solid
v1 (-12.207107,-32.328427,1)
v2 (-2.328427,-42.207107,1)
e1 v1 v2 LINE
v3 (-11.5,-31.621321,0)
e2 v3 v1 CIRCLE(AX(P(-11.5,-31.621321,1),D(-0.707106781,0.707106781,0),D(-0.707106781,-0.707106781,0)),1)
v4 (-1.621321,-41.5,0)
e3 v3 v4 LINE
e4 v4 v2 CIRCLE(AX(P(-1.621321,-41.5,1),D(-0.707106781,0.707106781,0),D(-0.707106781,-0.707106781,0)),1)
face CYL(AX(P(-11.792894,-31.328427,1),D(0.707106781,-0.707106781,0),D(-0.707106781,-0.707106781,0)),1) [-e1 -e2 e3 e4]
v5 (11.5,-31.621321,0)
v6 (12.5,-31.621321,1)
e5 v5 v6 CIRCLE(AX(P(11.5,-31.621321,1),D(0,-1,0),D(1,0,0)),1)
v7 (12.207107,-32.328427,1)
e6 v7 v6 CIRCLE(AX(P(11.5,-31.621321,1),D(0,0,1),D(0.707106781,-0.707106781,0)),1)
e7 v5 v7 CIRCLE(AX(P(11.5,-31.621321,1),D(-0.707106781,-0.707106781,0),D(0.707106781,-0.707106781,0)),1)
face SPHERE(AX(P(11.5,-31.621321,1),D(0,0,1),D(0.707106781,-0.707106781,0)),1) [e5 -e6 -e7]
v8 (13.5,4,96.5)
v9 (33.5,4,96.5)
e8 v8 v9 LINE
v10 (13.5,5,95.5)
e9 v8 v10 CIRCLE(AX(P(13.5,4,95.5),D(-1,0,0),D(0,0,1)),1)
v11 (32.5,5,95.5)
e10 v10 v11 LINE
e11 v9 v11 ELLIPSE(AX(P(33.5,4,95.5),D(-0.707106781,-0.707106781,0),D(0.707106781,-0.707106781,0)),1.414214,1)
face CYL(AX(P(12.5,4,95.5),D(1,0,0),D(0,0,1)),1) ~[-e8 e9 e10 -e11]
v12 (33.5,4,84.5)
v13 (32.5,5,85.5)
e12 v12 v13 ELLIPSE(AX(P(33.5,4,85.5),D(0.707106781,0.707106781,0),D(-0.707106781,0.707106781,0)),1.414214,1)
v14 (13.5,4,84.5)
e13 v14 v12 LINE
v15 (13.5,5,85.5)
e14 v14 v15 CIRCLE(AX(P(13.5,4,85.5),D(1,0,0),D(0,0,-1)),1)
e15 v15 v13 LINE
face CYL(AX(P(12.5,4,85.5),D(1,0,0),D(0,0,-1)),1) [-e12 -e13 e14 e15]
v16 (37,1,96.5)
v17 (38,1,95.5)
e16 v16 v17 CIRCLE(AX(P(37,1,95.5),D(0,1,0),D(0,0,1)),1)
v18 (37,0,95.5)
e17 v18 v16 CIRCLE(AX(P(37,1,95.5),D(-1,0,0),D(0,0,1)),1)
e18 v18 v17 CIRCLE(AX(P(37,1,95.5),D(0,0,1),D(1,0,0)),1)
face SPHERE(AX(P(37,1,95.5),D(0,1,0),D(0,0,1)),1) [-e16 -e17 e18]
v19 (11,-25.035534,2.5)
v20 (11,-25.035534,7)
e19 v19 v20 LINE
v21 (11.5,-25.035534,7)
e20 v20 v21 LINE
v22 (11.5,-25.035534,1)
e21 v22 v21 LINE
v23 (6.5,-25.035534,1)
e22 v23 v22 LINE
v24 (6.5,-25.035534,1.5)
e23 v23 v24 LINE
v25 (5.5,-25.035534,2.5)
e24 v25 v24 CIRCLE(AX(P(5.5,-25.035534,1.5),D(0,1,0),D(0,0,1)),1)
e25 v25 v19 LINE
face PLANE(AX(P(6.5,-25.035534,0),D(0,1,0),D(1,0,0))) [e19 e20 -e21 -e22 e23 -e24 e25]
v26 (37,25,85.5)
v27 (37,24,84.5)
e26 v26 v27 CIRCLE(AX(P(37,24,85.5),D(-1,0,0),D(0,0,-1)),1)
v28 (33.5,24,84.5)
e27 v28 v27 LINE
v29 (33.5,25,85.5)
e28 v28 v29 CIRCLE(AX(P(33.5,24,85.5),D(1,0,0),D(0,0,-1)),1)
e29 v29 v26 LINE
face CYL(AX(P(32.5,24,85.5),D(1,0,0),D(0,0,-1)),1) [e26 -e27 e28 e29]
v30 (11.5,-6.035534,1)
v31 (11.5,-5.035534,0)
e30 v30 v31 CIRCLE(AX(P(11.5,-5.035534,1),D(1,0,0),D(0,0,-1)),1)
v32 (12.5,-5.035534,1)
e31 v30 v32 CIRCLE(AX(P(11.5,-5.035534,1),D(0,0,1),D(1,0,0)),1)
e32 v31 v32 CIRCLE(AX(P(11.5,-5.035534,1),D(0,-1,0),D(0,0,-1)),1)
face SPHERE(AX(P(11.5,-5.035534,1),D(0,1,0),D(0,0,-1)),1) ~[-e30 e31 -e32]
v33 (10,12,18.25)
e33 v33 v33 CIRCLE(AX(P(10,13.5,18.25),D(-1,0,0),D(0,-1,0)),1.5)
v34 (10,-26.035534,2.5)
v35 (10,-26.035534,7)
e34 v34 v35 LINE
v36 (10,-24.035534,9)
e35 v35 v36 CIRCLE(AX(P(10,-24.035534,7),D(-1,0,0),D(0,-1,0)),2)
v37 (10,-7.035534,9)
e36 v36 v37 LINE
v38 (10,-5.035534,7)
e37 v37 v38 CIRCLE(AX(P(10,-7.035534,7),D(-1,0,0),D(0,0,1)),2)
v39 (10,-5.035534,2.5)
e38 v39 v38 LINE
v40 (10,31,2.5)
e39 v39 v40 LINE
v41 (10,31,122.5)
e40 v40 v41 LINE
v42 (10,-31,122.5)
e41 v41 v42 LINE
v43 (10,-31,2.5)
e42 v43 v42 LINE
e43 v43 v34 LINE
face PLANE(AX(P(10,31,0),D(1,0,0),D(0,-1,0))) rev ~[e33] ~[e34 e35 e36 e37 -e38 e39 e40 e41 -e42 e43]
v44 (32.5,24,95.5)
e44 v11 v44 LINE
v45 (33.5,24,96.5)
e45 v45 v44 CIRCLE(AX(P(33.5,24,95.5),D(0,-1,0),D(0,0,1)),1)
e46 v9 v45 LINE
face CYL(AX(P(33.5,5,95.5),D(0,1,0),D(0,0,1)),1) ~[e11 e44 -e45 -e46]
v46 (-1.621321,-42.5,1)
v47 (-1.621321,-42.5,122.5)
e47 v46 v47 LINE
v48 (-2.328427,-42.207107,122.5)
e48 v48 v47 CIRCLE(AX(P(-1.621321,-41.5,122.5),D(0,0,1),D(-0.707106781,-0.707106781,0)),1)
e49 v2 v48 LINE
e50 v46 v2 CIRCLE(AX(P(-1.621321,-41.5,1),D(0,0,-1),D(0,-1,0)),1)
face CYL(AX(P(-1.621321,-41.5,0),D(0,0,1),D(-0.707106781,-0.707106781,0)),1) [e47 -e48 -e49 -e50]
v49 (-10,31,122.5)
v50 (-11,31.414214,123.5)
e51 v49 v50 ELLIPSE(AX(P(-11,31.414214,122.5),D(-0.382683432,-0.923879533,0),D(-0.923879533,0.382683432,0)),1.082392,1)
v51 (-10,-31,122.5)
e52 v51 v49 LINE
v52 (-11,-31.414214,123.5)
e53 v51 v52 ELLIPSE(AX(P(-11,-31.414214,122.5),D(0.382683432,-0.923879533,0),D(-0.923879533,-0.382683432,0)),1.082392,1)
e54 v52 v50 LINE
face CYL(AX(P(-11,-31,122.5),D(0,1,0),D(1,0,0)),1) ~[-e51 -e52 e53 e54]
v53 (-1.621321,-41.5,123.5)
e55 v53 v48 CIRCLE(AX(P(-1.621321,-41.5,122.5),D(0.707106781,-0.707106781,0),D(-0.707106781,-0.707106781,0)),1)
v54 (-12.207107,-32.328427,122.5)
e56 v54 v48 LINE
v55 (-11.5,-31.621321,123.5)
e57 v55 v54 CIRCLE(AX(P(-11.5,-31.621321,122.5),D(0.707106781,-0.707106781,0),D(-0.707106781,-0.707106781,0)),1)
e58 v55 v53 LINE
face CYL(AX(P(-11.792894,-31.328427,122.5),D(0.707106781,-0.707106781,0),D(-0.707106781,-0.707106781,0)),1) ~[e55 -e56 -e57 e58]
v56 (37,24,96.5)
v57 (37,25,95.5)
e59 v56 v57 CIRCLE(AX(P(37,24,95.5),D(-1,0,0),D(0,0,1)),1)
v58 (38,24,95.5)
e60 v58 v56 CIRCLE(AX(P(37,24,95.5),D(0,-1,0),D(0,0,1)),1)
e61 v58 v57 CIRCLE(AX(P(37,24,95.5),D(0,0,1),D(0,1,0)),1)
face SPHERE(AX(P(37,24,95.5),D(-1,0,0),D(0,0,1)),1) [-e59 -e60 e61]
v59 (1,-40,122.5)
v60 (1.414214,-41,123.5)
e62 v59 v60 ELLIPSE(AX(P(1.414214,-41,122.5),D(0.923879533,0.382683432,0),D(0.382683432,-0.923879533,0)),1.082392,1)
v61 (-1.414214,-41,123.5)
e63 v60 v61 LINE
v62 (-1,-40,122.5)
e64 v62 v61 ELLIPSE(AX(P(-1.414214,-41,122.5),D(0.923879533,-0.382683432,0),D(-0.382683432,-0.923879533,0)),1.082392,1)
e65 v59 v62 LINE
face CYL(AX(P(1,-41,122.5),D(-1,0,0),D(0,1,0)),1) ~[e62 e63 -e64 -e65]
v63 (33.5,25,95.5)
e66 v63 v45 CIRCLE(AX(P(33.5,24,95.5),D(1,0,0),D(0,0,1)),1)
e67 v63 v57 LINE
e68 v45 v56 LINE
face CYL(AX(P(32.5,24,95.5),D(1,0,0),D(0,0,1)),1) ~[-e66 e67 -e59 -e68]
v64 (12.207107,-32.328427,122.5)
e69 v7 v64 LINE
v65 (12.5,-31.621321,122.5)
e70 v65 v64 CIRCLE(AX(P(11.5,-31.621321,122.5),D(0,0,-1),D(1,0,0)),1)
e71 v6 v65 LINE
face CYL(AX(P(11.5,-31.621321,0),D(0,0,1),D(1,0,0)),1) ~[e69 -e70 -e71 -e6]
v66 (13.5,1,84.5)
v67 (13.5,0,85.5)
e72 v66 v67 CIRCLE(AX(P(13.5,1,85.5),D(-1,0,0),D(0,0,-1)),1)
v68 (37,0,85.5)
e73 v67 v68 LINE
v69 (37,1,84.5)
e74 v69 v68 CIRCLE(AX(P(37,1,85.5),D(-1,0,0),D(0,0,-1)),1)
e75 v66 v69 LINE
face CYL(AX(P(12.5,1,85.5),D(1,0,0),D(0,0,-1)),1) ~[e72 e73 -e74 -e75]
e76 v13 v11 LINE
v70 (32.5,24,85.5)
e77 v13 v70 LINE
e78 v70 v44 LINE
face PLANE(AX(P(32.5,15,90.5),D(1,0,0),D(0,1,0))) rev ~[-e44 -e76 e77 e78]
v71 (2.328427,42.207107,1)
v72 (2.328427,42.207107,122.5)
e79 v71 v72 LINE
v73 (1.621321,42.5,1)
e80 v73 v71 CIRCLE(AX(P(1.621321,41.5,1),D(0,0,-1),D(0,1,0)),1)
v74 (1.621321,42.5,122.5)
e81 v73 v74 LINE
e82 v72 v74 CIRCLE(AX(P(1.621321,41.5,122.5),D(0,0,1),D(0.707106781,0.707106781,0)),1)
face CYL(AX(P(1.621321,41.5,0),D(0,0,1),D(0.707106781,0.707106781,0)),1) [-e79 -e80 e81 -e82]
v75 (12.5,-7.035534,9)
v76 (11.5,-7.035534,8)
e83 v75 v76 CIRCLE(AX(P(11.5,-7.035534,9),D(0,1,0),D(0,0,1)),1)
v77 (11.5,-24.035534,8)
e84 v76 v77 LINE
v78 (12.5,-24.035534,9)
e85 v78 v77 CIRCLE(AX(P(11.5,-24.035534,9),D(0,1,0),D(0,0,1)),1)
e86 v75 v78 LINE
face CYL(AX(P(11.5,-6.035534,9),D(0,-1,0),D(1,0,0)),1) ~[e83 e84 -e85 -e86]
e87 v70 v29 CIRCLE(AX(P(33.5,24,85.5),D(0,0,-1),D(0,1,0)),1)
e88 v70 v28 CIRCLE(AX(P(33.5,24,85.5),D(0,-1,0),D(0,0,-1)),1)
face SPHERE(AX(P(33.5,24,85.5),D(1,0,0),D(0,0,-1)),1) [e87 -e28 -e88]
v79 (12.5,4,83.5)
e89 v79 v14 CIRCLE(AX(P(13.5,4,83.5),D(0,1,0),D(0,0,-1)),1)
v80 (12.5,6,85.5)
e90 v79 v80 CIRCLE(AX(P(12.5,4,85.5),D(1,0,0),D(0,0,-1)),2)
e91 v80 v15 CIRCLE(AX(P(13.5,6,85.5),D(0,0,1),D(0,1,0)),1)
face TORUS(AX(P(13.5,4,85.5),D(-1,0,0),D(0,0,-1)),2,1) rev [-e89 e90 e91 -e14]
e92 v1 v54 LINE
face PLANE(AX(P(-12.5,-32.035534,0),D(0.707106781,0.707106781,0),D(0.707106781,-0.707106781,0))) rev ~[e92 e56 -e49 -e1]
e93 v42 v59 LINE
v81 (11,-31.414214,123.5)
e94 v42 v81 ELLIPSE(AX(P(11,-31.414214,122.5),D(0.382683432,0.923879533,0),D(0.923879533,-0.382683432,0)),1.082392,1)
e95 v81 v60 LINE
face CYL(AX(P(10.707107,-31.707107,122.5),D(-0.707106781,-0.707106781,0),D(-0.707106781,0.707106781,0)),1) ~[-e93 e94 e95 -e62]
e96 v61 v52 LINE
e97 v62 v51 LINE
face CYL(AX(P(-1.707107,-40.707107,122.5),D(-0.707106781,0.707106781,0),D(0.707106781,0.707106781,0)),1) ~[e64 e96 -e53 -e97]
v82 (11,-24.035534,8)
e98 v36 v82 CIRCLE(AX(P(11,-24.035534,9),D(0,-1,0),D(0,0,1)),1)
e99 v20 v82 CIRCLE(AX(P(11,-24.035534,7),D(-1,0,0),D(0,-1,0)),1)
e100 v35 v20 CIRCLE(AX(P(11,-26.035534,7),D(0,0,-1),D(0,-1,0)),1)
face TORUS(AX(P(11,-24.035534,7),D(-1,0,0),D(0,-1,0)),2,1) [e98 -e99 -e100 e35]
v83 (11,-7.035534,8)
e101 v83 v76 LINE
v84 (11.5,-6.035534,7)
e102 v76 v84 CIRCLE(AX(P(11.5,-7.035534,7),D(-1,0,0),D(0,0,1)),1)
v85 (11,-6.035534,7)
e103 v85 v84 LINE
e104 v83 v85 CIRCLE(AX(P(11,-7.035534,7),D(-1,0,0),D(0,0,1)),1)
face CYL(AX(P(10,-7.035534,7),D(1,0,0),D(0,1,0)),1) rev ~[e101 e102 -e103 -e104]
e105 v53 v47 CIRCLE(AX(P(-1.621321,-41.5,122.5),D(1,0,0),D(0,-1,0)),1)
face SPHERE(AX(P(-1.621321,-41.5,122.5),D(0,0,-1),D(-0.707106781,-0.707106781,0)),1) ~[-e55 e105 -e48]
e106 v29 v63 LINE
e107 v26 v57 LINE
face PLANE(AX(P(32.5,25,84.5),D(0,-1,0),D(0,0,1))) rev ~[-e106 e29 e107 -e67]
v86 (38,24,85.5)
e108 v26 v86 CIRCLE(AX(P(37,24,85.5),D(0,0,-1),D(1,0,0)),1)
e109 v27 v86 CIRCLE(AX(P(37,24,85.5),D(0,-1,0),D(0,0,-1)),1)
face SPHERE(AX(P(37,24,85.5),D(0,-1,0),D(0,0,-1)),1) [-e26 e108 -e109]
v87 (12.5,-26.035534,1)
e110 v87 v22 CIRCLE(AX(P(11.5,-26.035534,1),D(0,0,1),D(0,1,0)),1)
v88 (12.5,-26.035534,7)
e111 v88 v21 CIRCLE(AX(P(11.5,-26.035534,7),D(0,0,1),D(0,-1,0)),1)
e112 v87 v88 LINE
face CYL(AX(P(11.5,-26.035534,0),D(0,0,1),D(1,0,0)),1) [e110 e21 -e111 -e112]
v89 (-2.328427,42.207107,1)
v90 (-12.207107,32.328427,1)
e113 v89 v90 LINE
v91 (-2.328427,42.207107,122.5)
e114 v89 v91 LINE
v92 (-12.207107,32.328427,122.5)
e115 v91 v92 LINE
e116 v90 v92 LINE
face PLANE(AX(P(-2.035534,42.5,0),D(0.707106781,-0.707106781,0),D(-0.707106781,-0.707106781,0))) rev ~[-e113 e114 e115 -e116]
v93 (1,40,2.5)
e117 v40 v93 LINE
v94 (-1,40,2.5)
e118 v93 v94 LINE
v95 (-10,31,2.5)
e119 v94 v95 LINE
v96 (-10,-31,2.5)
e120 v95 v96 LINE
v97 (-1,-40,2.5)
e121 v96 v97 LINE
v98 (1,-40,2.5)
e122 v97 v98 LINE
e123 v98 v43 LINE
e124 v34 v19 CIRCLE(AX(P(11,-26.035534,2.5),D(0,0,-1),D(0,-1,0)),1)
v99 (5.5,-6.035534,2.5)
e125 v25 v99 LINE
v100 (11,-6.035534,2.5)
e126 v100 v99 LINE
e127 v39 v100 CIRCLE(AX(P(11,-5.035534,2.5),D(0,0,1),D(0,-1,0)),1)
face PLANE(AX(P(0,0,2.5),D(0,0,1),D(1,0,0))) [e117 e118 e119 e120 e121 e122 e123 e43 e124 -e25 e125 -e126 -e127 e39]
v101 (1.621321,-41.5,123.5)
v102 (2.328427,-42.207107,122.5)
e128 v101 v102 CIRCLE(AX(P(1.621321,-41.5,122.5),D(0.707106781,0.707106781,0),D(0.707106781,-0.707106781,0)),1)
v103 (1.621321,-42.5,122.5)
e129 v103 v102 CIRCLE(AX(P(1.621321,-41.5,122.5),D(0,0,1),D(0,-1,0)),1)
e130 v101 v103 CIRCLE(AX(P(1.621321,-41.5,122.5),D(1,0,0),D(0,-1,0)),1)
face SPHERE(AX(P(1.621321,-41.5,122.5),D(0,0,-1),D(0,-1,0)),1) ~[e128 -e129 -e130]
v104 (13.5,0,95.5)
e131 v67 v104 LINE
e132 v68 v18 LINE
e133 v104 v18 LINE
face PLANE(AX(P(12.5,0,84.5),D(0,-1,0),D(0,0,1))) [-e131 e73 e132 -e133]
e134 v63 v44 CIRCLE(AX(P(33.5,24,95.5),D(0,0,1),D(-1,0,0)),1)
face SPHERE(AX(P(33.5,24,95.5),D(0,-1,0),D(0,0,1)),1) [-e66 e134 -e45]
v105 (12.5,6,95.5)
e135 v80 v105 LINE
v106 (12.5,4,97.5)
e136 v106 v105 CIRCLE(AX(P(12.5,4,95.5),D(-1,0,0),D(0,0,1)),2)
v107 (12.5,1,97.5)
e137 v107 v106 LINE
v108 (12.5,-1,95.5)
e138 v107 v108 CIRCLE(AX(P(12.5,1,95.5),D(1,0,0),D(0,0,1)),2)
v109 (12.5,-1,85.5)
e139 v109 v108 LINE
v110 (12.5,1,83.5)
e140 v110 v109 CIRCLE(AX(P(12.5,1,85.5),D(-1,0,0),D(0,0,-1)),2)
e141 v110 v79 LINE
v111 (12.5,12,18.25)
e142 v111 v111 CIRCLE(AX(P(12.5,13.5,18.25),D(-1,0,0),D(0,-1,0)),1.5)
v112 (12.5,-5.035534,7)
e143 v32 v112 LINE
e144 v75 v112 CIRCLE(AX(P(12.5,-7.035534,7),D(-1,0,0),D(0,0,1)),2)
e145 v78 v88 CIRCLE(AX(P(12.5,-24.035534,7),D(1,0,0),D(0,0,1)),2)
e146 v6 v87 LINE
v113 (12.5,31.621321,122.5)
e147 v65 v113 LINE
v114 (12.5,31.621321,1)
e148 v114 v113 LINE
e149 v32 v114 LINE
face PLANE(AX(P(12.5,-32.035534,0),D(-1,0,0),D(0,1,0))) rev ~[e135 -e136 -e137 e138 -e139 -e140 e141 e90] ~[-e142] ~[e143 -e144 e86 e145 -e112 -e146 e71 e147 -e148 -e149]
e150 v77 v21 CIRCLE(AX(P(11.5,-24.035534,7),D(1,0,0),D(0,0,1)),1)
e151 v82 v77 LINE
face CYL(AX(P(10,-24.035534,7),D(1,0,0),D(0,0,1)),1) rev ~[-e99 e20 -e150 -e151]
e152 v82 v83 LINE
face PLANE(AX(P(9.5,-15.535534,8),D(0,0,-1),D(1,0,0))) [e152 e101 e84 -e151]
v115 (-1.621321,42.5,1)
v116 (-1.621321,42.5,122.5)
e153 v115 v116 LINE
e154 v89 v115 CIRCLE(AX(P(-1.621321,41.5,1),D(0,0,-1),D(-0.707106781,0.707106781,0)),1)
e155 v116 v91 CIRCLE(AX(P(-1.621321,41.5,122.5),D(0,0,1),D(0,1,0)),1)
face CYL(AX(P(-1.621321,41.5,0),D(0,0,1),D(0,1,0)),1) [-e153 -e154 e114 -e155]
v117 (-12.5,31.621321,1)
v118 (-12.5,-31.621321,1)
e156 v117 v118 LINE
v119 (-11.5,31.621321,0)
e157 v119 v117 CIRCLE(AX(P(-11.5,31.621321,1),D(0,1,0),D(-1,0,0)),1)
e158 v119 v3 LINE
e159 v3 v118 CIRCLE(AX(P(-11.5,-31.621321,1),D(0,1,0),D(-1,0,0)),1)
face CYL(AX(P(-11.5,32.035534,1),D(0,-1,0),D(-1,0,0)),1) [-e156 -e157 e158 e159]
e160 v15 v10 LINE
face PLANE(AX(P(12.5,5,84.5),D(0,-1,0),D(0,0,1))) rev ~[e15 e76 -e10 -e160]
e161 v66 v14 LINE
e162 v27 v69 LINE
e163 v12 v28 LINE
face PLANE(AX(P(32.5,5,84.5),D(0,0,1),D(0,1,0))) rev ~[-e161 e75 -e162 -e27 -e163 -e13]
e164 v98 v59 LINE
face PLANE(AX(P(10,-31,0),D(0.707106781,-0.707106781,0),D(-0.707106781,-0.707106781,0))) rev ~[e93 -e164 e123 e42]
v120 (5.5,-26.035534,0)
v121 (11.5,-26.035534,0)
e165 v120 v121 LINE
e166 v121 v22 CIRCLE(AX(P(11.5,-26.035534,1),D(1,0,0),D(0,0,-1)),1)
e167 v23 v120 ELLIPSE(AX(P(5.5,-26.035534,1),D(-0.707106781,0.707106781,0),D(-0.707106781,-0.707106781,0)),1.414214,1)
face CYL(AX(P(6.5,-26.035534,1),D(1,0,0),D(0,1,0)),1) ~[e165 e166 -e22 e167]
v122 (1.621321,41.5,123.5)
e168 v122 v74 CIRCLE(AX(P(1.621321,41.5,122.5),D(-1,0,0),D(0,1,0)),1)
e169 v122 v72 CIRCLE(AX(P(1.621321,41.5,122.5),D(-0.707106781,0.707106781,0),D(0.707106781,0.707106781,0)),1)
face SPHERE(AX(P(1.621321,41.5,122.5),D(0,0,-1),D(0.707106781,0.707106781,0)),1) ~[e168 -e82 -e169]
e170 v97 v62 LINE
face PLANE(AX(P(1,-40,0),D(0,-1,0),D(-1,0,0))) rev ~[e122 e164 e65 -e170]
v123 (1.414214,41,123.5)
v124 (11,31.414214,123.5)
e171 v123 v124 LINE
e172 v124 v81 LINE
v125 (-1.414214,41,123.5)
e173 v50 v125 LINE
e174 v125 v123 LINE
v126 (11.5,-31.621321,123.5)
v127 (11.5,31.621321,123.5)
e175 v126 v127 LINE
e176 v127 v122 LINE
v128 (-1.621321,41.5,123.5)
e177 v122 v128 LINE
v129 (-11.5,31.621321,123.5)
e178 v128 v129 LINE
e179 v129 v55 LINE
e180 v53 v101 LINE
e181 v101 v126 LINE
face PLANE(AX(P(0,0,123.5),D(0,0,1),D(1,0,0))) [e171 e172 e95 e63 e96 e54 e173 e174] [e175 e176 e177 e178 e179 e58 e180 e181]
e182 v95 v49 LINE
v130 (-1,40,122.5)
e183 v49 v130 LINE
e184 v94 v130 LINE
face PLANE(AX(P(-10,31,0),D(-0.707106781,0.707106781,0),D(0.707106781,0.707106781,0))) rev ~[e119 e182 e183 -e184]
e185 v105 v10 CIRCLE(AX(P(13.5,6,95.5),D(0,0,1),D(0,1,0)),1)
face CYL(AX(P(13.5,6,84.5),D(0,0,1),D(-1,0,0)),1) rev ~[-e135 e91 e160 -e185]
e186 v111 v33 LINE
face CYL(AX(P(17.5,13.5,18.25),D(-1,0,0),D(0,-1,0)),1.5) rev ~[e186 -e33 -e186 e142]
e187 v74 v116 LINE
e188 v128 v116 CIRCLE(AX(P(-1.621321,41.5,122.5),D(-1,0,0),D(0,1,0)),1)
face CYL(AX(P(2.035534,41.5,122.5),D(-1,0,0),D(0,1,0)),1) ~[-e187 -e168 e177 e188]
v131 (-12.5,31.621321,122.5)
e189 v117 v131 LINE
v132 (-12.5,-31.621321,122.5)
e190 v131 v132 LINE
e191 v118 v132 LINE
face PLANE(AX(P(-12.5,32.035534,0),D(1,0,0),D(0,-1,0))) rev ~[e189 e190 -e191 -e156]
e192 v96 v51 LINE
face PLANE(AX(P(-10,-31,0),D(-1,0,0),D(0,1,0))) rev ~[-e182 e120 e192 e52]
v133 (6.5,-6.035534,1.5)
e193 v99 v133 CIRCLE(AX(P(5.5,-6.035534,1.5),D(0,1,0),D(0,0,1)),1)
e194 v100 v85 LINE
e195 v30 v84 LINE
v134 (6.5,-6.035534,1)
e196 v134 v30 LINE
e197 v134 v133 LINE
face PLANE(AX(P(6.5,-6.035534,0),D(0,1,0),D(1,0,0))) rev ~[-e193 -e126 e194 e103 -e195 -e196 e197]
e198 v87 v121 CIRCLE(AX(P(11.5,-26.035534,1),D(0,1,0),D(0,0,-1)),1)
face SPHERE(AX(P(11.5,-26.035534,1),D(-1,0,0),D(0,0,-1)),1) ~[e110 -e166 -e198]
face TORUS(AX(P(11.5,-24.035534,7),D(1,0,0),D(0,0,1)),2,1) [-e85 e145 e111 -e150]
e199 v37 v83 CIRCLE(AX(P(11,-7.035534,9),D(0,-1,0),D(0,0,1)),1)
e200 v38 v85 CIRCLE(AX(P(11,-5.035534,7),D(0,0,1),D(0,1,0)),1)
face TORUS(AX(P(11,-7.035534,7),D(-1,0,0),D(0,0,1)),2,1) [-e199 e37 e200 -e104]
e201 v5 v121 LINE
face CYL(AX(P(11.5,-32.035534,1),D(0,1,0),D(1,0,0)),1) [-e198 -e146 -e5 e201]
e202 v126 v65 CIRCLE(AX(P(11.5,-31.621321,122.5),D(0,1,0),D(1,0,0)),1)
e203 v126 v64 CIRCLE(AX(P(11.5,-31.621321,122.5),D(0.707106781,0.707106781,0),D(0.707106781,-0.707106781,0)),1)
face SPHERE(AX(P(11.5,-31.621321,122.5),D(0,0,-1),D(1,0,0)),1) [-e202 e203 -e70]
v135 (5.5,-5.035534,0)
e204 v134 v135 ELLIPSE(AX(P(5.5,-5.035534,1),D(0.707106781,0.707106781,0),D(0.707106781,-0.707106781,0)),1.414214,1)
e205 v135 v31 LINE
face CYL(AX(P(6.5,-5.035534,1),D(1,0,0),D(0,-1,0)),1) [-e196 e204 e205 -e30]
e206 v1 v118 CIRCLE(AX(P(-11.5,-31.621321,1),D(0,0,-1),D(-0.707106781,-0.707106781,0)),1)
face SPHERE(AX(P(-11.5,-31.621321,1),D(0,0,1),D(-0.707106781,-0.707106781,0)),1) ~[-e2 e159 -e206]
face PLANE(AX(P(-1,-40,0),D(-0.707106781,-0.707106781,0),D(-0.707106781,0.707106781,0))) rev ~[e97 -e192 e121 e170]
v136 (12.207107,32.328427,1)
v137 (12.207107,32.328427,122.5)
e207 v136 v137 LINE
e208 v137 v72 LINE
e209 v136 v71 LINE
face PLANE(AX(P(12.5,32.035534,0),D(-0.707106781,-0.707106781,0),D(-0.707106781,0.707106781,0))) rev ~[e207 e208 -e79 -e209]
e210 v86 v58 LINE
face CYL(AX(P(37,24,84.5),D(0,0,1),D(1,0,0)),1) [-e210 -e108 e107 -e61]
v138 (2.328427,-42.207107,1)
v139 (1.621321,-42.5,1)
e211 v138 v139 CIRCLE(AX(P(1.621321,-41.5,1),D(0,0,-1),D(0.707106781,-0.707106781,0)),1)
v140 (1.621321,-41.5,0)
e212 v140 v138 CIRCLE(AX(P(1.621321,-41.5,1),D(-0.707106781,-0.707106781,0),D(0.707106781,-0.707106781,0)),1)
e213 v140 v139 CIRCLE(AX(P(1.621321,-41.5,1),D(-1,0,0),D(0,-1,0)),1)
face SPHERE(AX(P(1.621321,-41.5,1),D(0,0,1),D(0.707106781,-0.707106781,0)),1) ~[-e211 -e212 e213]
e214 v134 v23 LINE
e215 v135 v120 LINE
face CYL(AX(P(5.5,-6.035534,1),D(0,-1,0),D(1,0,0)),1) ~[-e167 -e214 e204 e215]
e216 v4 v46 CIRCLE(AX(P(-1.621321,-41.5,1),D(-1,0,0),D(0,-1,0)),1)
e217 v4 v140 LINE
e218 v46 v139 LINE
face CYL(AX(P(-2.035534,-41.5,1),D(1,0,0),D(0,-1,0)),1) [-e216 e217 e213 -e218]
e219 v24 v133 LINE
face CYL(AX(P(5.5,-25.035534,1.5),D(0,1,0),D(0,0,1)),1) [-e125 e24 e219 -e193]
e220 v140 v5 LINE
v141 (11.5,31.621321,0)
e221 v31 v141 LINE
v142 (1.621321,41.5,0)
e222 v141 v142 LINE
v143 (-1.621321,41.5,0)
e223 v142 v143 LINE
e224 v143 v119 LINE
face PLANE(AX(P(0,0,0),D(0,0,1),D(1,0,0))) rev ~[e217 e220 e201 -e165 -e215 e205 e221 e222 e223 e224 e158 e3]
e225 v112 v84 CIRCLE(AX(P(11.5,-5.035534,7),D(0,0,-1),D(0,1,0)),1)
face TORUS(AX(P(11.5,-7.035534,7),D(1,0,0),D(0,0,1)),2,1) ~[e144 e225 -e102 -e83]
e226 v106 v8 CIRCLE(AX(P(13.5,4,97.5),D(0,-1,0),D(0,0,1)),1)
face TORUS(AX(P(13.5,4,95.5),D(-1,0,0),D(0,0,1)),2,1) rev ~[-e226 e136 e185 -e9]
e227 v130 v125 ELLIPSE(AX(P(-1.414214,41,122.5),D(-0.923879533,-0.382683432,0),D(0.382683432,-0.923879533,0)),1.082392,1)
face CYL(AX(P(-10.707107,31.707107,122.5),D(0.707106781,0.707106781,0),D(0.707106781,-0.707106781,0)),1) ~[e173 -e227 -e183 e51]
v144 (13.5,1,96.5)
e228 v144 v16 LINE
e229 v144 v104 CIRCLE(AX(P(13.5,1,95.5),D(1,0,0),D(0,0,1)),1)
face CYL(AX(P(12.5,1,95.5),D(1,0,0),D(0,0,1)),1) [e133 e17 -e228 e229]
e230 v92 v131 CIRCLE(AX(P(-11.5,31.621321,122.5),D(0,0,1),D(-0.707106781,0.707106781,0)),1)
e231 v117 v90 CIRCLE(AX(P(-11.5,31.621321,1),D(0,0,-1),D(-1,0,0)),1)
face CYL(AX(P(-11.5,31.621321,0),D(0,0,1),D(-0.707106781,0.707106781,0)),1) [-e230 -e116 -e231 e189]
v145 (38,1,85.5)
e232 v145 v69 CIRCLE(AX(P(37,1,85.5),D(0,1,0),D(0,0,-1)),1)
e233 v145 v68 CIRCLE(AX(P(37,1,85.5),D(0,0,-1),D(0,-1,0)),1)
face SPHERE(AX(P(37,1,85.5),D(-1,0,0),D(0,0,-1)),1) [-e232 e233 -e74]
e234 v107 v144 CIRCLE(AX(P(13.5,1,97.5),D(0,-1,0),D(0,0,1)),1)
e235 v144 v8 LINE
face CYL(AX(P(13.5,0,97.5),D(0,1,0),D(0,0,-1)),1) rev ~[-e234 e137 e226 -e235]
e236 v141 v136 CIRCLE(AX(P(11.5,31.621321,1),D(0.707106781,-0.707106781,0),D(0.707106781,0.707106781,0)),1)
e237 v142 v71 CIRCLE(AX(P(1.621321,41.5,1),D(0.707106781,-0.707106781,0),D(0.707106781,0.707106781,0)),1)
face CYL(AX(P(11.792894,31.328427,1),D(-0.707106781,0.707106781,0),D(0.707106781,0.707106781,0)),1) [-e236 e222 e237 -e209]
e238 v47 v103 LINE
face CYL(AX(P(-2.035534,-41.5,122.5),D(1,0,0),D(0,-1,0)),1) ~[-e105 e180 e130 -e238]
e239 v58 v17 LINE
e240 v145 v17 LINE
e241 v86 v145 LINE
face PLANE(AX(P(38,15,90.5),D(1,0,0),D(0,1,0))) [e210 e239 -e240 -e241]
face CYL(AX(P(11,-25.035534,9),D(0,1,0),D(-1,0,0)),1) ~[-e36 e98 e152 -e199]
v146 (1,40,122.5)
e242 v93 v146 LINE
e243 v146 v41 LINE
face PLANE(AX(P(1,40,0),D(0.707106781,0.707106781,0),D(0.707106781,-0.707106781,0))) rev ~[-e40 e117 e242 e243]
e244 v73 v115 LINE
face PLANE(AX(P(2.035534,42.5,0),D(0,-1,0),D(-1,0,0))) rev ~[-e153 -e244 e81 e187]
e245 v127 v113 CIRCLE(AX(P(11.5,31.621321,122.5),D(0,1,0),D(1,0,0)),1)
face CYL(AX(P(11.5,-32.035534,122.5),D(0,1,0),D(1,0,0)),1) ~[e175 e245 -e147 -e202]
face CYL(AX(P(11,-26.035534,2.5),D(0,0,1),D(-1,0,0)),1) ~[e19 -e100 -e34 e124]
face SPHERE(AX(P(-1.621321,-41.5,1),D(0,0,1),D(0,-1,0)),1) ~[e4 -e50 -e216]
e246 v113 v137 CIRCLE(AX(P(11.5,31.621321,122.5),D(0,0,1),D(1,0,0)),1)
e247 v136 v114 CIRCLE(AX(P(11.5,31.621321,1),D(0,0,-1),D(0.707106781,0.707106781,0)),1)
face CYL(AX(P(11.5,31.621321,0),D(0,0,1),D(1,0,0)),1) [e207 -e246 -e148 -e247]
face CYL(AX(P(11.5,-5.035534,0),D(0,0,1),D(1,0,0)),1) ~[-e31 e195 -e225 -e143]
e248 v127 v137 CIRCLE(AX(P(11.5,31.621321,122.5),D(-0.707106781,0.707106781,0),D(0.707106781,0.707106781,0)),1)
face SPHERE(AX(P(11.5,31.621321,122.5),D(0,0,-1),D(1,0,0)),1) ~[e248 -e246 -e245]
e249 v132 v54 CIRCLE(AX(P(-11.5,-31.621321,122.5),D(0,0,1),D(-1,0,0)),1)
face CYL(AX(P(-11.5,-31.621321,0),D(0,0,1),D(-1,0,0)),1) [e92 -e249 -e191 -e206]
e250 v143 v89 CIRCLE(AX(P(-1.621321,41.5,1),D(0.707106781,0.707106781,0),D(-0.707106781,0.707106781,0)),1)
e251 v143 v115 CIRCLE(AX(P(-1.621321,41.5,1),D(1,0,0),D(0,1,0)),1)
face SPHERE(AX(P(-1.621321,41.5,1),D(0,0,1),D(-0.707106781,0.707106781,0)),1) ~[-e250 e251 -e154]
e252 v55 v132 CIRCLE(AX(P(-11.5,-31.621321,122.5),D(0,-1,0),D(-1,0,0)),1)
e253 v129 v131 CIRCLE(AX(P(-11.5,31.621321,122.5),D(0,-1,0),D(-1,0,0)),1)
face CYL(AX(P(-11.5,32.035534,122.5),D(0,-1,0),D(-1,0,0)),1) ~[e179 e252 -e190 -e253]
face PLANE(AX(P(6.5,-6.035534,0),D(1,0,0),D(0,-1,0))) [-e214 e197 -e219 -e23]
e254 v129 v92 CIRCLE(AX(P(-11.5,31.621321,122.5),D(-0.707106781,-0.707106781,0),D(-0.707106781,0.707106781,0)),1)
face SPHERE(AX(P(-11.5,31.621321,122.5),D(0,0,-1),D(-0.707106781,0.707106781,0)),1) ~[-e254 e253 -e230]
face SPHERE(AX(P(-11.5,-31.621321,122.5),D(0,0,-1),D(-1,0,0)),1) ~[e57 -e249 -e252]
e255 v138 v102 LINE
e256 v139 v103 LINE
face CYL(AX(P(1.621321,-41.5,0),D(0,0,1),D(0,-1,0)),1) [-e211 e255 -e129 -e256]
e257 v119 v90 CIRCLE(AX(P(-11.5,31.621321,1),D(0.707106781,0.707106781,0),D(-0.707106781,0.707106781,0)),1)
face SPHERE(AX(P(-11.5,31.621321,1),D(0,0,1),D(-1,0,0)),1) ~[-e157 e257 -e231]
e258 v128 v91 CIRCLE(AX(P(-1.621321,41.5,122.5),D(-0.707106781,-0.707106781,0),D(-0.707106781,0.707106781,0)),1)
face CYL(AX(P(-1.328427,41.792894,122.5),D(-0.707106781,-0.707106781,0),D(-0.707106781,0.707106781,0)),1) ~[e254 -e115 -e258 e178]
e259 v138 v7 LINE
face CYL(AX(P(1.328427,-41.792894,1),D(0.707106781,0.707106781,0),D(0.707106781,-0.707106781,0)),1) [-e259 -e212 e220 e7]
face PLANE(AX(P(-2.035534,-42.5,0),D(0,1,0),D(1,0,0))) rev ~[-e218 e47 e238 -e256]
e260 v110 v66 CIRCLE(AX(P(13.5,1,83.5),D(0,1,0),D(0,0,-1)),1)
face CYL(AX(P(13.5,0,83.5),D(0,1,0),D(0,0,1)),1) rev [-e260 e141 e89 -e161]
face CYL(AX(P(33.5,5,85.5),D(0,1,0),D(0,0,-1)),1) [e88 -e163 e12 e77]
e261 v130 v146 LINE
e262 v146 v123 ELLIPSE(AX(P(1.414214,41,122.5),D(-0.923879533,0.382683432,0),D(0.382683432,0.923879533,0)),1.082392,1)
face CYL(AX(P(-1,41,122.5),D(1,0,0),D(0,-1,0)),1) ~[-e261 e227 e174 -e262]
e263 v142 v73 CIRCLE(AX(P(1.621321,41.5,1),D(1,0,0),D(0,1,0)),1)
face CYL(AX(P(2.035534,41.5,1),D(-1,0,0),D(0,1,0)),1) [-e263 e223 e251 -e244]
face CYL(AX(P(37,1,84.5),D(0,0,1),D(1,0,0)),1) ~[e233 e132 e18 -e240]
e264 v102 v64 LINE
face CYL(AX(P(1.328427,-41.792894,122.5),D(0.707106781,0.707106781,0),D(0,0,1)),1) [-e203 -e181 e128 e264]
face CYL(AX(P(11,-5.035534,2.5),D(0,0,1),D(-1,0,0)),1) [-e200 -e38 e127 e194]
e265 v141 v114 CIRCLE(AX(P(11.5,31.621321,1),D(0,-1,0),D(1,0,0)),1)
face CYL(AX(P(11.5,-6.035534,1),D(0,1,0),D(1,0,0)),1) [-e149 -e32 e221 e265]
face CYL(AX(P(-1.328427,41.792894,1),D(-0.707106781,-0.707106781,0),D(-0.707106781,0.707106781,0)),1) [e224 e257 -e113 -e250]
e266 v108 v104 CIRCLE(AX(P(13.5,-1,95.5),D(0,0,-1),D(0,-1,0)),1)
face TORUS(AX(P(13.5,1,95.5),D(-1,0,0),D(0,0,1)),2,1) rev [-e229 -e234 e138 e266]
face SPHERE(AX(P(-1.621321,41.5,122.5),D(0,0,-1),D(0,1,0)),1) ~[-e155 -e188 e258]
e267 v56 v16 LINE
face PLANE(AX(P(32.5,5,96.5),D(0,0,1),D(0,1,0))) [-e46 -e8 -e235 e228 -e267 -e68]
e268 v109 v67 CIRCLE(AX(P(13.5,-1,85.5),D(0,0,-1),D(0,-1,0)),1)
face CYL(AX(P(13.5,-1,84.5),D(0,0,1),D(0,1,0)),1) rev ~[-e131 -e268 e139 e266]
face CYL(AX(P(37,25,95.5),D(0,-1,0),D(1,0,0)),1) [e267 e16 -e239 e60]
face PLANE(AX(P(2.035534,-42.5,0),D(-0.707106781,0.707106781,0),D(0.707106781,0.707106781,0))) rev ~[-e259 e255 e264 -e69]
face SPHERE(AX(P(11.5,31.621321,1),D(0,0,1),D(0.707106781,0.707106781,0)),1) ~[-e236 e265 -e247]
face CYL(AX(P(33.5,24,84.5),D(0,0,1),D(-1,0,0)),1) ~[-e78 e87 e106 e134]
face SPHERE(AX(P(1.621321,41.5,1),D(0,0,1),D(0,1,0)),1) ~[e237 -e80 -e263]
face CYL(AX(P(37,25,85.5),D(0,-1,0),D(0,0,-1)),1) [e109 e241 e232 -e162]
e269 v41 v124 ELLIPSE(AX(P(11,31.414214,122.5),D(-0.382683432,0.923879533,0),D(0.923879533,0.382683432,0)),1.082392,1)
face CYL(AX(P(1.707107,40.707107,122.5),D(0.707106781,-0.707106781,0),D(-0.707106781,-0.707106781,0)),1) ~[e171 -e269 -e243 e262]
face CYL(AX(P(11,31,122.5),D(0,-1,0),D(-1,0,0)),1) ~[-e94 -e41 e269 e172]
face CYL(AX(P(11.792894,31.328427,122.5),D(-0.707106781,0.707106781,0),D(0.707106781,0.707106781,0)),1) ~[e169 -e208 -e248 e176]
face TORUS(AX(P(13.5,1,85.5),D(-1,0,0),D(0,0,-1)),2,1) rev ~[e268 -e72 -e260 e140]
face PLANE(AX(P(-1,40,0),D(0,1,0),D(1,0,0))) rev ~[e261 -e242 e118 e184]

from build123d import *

# Parameters (mm, degrees)
F1_DEPTH = 2.5
F2_DEPTH = 123.5
F3_W     = 6
F3_H     = 19
F4_DEPTH = 8
F6_D     = 3
F6_DEPTH = 5
F6_TIP   = 0.9012909285
F5_W     = 5
F5_H     = 12
F7_DEPTH = 25.5
F8_START = 20
F5_W_2   = 20
F8_DEPTH = 5.5
F9_R     = 1


with BuildPart() as f1:
    # F0 (on Top) → F1 (new body)
    with BuildSketch(Plane.XY):
        Polygon((10, 31), (1, 40), (-1, 40), (-10, 31), (-10, -31), (-1, -40), (1, -40), (10, -31), align=None)
    extrude(amount=F1_DEPTH)

    # F0 (on Top) → F2 (join)
    with BuildSketch(Plane.XY):
        Polygon((12.500000447, -32.0355340911), (12.500000447, 32.0355340911), (2.0355340911, 42.500000447), (-2.0355340911, 42.500000447), (-12.500000447, 32.0355340911), (-12.500000447, -32.0355340911), (-2.0355340911, -42.500000447), (2.0355340911, -42.500000447), align=None)
        Polygon((-1, 40), (1, 40), (10, 31), (10, -31), (1, -40), (-1, -40), (-10, -31), (-10, 31), align=None, mode=Mode.SUBTRACT)
    extrude(amount=F2_DEPTH)

    # F3 (on face) → F4 (cut)
    with BuildSketch(Plane(origin=(0, 0, 0), x_dir=(1, 0, 0), z_dir=(0, 0, -1))):
        with Locations((9.500000447, 15.5355340911)):
            Rectangle(F3_W, F3_H)
    extrude(amount=-F4_DEPTH, mode=Mode.SUBTRACT)

    # F6
    with Locations(Plane.YZ.offset(12.500000447)):
        with Locations((13.5, 18.25)):
            Hole(F6_D / 2, depth=F6_DEPTH)
            with Locations((0, 0, -(F6_DEPTH + F6_TIP / 2))):  # 118° drill point
                Cone(0, F6_D / 2, F6_TIP, mode=Mode.SUBTRACT)

    # F5 (on face) → F7 (join)
    with BuildSketch(Plane.YZ.offset(12.500000447)):
        with Locations((2.5, 90.5)):
            Rectangle(F5_W, F5_H)
    extrude(amount=F7_DEPTH)

    # F5 (on face) → F8 (join)
    with BuildSketch(Plane.YZ.offset(12.500000447).offset(F8_START)):
        with Locations((15, 90.5)):
            Rectangle(F5_W_2, F5_H)
    extrude(amount=F8_DEPTH)

    # F9
    f9_edges = [f1.edges().sort_by_distance(p)[0] for p in [
        (12.5, 0, 123.5),
        (7.267767, 37.267767, 123.5),
        (0, 42.5, 123.5),
        (-7.267767, 37.267767, 123.5),
        (-12.5, 0, 123.5),
        (-7.267767, -37.267767, 123.5),
        (0, -42.5, 123.5),
        (7.267767, -37.267767, 123.5),
        (0, 40, 123.5),
        (5.5, 35.5, 123.5),
        (10, 0, 123.5),
        (5.5, -35.5, 123.5),
        (0, -40, 123.5),
        (-5.5, -35.5, 123.5),
        (-10, 0, 123.5),
        (-5.5, 35.5, 123.5),
        (22.5, 5, 96.5),
        (32.5, 15, 96.5),
        (35.25, 25, 96.5),
        (38, 12.5, 96.5),
        (25.25, 0, 96.5),
        (12.5, 2.5, 96.5),
        (25.25, 0, 84.5),
        (38, 12.5, 84.5),
        (35.25, 25, 84.5),
        (32.5, 15, 84.5),
        (22.5, 5, 84.5),
        (12.5, 2.5, 84.5),
        (7.267767, -37.267767, 0),
        (0, -42.5, 0),
        (-7.267767, -37.267767, 0),
        (-12.5, 0, 0),
        (-7.267767, 37.267767, 0),
        (0, 42.5, 0),
        (7.267767, 37.267767, 0),
        (12.5, 13, 0),
        (9.5, -6.035534, 0),
        (6.5, -15.535534, 0),
        (9.5, -25.035534, 0),
        (12.5, -28.535534, 0),
        (-2.035534, 42.5, 61.75),
        (-12.5, 32.035534, 61.75),
        (-12.5, -32.035534, 61.75),
        (-2.035534, -42.5, 61.75),
        (2.035534, 42.5, 61.75),
        (12.5, 32.035534, 61.75),
        (12.5, -32.035534, 61.75),
        (2.035534, -42.5, 61.75),
        (11.25, -6.035534, 8),
        (10, -15.535534, 8),
        (11.25, -25.035534, 8),
        (12.5, -15.535534, 8),
        (6.5, -15.535534, 2.5),
        (32.5, 25, 90.5),
        (38, 25, 90.5),
        (38, 0, 90.5),
        (10, -25.035534, 5.25),
        (12.5, -25.035534, 4),
        (10, -6.035534, 5.25),
        (12.5, -6.035534, 4),
        (12.5, 5, 90.5),
        (12.5, 0, 90.5),
    ]]
    fillet(f9_edges, radius=F9_R)


solid = f1.part
